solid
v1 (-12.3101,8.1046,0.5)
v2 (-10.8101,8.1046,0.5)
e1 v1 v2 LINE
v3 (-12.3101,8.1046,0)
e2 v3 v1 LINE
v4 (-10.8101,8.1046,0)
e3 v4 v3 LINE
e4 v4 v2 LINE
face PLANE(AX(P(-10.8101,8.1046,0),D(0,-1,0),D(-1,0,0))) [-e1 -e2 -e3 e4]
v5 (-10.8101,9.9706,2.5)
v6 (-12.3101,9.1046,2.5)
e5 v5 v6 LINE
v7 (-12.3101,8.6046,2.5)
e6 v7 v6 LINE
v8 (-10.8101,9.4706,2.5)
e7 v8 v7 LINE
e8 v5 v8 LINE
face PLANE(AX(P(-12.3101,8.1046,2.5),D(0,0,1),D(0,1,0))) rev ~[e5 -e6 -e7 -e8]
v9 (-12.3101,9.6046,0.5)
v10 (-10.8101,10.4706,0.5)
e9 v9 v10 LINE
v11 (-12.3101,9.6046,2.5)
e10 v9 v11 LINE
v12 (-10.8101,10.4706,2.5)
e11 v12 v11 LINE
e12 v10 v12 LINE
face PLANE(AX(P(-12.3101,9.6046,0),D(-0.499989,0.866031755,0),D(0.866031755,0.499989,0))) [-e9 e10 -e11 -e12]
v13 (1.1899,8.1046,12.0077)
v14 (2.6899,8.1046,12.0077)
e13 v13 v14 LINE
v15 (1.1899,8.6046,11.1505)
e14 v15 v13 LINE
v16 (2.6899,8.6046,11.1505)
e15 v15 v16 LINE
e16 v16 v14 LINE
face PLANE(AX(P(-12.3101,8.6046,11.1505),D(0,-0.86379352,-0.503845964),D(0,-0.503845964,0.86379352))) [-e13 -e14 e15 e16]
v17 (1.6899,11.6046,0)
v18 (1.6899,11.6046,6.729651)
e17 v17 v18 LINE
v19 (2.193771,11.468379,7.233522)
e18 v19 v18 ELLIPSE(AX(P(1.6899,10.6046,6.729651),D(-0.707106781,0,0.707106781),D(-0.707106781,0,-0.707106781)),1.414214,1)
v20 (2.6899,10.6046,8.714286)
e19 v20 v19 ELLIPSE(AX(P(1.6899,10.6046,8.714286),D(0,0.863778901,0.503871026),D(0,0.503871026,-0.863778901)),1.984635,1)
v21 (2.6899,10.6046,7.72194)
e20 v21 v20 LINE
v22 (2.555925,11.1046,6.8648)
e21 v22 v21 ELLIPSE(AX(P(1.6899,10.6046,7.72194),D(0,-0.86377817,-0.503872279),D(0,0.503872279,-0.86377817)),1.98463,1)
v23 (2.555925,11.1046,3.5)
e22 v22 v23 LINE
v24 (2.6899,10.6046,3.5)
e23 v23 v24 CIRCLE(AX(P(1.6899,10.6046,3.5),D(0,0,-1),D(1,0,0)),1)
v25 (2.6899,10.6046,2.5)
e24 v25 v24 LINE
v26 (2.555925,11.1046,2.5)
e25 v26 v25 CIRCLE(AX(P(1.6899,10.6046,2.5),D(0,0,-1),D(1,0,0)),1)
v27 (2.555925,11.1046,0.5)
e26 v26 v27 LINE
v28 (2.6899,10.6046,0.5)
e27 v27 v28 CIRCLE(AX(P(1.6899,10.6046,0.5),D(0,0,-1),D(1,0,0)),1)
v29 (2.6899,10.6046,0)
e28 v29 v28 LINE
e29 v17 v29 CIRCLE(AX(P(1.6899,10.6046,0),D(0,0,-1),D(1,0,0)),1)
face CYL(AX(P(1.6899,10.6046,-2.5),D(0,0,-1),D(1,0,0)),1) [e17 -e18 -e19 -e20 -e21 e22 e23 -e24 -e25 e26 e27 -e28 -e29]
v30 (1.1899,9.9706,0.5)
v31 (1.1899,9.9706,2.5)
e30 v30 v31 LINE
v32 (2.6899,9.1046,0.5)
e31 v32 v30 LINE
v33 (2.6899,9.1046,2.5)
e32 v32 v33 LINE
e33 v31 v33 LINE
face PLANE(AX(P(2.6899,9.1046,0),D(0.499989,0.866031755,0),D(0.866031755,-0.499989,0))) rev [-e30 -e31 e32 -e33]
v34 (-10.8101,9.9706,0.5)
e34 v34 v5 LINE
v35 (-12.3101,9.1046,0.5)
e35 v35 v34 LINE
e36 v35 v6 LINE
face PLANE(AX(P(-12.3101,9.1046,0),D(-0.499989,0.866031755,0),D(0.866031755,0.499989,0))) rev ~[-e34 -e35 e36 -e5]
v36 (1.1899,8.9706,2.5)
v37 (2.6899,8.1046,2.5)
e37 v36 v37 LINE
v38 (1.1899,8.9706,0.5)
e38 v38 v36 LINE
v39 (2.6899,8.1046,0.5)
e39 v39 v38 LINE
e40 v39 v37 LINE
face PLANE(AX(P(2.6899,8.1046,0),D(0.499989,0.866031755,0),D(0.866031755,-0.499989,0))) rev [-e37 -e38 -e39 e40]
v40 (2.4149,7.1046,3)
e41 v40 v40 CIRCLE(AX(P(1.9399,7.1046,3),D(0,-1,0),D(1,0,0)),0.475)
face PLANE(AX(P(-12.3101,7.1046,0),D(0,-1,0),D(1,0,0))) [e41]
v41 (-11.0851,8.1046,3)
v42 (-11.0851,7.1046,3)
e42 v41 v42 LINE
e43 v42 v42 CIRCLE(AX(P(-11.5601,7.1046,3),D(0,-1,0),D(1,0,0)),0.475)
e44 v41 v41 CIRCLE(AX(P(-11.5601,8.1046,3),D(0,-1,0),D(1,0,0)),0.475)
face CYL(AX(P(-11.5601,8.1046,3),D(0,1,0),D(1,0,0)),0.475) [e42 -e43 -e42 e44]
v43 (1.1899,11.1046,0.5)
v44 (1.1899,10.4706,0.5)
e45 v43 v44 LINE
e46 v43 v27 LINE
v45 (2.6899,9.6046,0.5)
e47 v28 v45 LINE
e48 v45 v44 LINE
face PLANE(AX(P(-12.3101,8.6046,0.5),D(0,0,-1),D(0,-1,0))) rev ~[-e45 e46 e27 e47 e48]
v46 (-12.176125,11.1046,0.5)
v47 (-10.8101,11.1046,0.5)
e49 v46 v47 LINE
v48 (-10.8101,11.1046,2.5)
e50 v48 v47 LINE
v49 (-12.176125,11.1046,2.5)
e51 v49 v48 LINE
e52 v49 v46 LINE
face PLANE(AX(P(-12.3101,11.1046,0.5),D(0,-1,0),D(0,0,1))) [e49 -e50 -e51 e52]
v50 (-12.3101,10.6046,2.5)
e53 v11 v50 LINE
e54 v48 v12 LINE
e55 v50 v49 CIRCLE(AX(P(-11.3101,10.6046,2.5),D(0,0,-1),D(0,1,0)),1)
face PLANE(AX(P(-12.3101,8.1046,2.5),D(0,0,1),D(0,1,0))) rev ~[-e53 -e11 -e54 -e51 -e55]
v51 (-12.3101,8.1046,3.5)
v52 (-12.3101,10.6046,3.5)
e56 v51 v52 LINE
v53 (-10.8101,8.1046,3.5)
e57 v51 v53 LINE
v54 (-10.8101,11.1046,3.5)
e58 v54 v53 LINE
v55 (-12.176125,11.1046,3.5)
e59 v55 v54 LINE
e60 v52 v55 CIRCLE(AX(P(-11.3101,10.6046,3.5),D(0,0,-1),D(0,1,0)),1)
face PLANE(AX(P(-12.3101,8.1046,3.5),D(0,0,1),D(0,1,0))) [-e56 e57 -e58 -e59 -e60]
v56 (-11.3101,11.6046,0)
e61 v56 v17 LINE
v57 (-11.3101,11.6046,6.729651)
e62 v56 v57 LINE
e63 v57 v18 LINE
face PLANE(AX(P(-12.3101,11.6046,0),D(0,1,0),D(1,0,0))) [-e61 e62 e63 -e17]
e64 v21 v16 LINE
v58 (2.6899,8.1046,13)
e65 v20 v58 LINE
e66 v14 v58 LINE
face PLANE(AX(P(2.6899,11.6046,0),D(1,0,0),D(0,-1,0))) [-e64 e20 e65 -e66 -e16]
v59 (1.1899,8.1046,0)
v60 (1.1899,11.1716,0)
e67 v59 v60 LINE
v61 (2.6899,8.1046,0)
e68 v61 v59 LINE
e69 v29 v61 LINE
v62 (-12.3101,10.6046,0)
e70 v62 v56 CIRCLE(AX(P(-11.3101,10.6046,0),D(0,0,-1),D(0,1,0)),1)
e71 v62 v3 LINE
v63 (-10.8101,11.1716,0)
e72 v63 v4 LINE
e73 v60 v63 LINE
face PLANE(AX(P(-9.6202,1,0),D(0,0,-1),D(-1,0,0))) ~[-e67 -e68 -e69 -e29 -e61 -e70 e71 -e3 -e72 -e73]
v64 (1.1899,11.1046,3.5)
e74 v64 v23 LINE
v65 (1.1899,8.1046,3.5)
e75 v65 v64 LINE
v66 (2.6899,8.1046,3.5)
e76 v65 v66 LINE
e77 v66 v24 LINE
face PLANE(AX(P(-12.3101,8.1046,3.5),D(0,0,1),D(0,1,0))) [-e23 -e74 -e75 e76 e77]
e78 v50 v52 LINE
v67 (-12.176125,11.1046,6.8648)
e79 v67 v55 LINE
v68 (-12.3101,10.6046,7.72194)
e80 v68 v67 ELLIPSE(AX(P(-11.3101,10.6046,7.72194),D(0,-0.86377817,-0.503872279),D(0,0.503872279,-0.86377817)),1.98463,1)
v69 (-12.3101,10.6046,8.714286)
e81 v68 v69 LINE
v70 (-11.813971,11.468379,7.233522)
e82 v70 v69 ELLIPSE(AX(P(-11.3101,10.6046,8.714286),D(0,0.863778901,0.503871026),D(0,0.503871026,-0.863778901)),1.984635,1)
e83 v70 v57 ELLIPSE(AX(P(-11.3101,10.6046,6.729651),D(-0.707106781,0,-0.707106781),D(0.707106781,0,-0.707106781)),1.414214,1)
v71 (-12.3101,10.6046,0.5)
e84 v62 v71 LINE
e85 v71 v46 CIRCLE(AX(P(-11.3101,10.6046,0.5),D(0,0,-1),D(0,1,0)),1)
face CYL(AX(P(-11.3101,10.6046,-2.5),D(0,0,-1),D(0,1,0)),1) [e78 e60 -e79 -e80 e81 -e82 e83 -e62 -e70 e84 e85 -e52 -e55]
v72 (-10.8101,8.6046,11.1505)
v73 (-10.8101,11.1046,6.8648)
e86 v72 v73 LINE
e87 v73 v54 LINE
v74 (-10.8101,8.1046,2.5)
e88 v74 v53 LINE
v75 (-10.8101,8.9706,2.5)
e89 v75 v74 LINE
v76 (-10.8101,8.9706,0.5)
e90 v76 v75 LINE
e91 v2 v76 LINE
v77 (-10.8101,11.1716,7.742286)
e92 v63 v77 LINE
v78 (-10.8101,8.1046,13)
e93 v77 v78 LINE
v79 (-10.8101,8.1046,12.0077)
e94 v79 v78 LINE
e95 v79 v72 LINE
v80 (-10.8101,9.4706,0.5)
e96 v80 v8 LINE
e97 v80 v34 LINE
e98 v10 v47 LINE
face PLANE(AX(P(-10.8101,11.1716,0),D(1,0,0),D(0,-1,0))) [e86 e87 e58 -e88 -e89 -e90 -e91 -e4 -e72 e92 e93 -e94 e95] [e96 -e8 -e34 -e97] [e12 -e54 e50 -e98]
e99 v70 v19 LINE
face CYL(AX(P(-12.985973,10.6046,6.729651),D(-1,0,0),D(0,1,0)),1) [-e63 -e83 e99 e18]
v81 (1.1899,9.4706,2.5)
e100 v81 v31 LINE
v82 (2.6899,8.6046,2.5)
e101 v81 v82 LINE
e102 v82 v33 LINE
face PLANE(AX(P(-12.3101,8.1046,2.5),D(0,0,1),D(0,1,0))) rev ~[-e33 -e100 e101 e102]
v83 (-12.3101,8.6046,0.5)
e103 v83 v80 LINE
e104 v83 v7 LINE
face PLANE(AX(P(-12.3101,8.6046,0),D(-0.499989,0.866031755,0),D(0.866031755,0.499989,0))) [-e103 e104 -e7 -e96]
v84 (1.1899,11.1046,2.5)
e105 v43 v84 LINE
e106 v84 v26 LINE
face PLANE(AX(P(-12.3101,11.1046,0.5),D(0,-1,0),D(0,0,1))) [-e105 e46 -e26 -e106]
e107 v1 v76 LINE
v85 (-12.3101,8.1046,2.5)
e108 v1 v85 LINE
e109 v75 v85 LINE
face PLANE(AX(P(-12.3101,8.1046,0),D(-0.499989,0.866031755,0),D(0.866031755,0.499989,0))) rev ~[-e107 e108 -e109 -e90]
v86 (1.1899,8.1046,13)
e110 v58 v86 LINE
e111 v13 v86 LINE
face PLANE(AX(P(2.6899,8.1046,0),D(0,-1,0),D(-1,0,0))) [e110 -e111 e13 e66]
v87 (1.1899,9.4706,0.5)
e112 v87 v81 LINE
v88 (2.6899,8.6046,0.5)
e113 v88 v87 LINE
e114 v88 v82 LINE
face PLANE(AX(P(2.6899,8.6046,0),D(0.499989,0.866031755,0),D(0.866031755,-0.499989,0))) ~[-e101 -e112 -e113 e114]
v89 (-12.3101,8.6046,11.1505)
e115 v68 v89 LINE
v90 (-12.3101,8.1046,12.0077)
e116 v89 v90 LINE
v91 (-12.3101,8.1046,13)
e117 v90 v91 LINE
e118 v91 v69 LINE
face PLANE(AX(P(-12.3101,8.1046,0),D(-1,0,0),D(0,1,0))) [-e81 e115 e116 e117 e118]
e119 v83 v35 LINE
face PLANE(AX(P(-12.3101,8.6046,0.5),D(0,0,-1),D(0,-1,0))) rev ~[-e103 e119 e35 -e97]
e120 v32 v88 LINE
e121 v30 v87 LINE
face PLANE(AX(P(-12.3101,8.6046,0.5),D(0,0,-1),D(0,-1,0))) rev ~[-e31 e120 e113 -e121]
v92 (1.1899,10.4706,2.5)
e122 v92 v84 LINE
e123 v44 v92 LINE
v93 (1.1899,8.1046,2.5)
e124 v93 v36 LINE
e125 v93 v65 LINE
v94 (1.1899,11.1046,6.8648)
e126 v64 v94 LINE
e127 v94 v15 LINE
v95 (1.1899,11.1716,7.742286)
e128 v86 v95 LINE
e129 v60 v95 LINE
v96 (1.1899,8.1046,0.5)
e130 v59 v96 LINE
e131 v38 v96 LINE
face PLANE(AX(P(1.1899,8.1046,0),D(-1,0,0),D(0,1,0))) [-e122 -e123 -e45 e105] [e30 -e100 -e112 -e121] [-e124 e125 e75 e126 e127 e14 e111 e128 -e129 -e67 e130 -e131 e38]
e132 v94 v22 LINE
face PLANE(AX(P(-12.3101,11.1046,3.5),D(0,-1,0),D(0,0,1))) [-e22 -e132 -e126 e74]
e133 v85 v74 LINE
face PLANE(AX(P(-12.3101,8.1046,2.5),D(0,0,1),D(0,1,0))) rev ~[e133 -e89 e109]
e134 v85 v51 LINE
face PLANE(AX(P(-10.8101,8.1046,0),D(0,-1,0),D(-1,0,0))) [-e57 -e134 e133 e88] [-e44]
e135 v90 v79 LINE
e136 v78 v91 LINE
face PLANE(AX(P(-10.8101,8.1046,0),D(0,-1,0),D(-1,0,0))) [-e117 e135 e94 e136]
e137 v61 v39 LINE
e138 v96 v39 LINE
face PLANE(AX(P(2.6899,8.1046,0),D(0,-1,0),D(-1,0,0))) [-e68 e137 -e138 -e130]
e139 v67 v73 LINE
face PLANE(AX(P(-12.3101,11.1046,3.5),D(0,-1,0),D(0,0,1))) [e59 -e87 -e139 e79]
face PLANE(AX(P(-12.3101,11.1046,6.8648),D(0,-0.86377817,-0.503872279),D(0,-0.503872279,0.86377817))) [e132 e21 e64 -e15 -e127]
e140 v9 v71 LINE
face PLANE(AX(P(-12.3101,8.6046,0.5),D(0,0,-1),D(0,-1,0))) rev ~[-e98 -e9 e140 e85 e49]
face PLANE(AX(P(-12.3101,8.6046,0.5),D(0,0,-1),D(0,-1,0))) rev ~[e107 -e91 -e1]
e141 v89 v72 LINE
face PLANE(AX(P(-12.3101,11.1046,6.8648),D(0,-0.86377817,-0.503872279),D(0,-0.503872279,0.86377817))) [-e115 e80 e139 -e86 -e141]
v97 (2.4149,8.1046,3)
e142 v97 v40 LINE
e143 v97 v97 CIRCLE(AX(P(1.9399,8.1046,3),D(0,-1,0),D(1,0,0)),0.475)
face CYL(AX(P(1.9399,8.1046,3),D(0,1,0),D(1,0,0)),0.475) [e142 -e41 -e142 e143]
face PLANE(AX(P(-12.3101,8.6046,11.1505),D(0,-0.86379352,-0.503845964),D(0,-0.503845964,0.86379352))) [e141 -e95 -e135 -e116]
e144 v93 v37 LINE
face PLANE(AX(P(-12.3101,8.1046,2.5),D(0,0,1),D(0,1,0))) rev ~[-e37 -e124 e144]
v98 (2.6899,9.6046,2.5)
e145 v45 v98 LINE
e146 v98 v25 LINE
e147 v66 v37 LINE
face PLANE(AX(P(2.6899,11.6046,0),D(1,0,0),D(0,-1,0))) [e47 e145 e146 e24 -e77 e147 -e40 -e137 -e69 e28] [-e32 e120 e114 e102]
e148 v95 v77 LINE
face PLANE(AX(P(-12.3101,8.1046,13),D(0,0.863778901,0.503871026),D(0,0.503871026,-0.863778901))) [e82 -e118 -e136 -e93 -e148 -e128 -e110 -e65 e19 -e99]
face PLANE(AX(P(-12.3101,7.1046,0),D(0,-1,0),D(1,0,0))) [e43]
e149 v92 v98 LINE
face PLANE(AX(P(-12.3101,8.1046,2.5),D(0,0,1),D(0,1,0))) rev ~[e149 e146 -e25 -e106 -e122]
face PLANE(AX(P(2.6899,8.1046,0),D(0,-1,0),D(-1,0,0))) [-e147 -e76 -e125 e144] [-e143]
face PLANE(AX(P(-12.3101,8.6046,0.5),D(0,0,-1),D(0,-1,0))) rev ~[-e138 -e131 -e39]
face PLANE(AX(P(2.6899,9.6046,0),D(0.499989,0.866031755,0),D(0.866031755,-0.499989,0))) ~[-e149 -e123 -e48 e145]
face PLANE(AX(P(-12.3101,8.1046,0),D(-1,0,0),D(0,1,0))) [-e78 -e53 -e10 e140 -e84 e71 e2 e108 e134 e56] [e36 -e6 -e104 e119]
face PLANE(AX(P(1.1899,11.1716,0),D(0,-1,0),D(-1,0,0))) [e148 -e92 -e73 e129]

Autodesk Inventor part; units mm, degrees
ref_plane "YZ Plane" through (0, 0, 0) normal (1, 0, 0) x (0, 1, 0)
ref_plane "XZ Plane" through (0, 0, 0) normal (0, 1, 0) x (-1, 0, 0)
sketch "Szkic1" plane through (0, 0, 0) normal (0, 0, 1) x (1, 0, 0)
  line L0 (-10.8101, 8.1046) -> (-12.3101, 8.1046)
  line L1 (-12.3101, 8.1046) -> (-12.3101, 11.6046)
  line L2 (-12.3101, 11.6046) -> (-10.8101, 11.6046)
  line L3 (-10.8101, 11.6046) -> (-10.8101, 8.1046)
  line L4 (-10.8101, 11.6046) -> (1.1899, 11.6046)
  line L5 (1.1899, 11.6046) -> (1.1899, 11.1716)
  line L6 (1.1899, 11.1716) -> (-10.8101, 11.1716)
  line L7 (-10.8101, 11.1716) -> (-10.8101, 11.6046)
  line L8 (1.1899, 11.6046) -> (2.6899, 11.6046)
  line L9 (2.6899, 11.6046) -> (2.6899, 8.1046)
  line L10 (2.6899, 8.1046) -> (1.1899, 8.1046)
  line L11 (1.1899, 8.1046) -> (1.1899, 11.6046)
  point P0 (0, 0)
  dimension "d0" = 1.5
  dimension "d1" = 1.5
  dimension "d2" = 15
  dimension "d3" = 0.433
  dimension "d6" = 3.5
extrude "Wyciągnięcie proste1" add sketch "Szkic1" along normal blind 13
sketch "Szkic2" plane through (-12.3101, 8.1046, 0) normal (-1, 0, 0) x (0, 0, 1)
  line L0 (0, 0) -> (13, 0) projected
  line L1 (13, 0) -> (7, 3.5)
  line L2 (0, 3.5) -> (13, 3.5) projected
  line L3 (0, 3.5) -> (0, 0) projected
  line L4 (13, 3.5) -> (13, 0) projected
  line L5 (13, 0) -> (13, 3.5)
  point P0 (0, -8.1046)
  dimension "d7" = 7
extrude "Wyciągnięcie proste2" cut sketch "Szkic2" against normal through all contours L1 L2 L4
sketch "Szkic4" plane through (-12.3101, 8.1046, 0) normal (0, -1, 0) x (1, 0, 0)
  circle A0 centre (14.25, 3) radius 0.475
  line L0 (13.5, 0) -> (13.5, 13) projected
  line L1 (13.5, 0) -> (15, 0) projected
  circle A1 centre (0.75, 3) radius 0.475
  line L2 (0, 0) -> (1.5, 0) projected
  line L3 (0, 0) -> (0, 13) projected
  point P0 (12.3101, 0)
  dimension "d10" = 0.95
  dimension "d11" = 0.75
  dimension "d12" = 3
  dimension "d13" = 3
  dimension "d14" = 0.75
  dimension "d15" = 0.95
extrude "Wyciągnięcie proste3" add sketch "Szkic4" along normal blind 1
sketch "Szkic5" plane through (-12.3101, 8.1046, 0) normal (-1, 0, 0) x (0, 0, 1)
  line L0 (0, 0) -> (13, 0) projected
  line L1 (0, 3.5) -> (7, 3.5) projected
  line L2 (13, 0) -> (7, 3.5) projected
  line L3 (0, 3.5) -> (7, 3.5) projected
  line L4 (0, 3.5) -> (0, 0) projected
  line L5 (0, 0) -> (13, 0) projected
  line L6 (6.8648, 3) -> (11.1505, 0.5)
  line L7 (0.5, 0.5) -> (0.5, 3)
  line L8 (0.5, 3) -> (6.8648, 3)
  line L9 (11.1505, 0.5) -> (12.0077, 0)
  line L10 (0.5, 0.5) -> (0.5, 0)
  line L11 (2.5, 0) -> (2.5, 3)
  line L12 (3.5, 0) -> (3.5, 3)
  point P0 (0, -8.1046)
  dimension "d19" = 0.5
  dimension "d20" = 1
  dimension "d21" = 2
extrude "Wyciągnięcie proste4" cut sketch "Szkic5" against normal blind 15 contours L10 L7 L8 L11 L0 | L12 L8 L6 L9 L0
sketch "Szkic7" plane through (0, 0, 0) normal (0, 0, -1) x (-1, 0, 0)
  line L0 (12.3101, 11.6046) -> (12.3101, 8.1046) projected
  line L1 (12.3101, 8.1046) -> (10.8101, 8.9706)
  line L2 (10.8101, 8.1046) -> (10.8101, 11.1046) projected
  line L3 (12.3101, 8.6046) -> (10.8101, 9.4706)
  line L4 (12.3101, 8.1046) -> (10.8101, 8.1046) projected
  point P0 (0, 0)
  dimension "d33" = 60
  dimension "d34" = 60
  dimension "d35" = 0
  dimension "d36" = 0.5
extrude "Wyciągnięcie proste6" add sketch "Szkic7" against normal blind 3 contours L0 L1 L2 L3
pattern_linear "Szyk prostokątny1" count 2 spacing 1 along (0, 1, 0) of "Wyciągnięcie proste6"
ref_plane "Płaszczyzna konstrukcyjna1" through (-4.8101, 8.1046, 0) normal (-1, 0, 0) x (0, 0, 1)
mirror "Odbij1" about plane through (-4.8101, 8.1046, 0) normal (-1, 0, 0) of "Wyciągnięcie proste6", "Szyk prostokątny1"
fillet "Zaokrąglenie1" radius 1 3 edges at (-12.3101, 11.6046, 3.5) (-4.8101, 11.6046, 7) (2.6899, 11.6046, 3.5)
properties part number "dach" material "Tworzywo sztuczne ABS"
